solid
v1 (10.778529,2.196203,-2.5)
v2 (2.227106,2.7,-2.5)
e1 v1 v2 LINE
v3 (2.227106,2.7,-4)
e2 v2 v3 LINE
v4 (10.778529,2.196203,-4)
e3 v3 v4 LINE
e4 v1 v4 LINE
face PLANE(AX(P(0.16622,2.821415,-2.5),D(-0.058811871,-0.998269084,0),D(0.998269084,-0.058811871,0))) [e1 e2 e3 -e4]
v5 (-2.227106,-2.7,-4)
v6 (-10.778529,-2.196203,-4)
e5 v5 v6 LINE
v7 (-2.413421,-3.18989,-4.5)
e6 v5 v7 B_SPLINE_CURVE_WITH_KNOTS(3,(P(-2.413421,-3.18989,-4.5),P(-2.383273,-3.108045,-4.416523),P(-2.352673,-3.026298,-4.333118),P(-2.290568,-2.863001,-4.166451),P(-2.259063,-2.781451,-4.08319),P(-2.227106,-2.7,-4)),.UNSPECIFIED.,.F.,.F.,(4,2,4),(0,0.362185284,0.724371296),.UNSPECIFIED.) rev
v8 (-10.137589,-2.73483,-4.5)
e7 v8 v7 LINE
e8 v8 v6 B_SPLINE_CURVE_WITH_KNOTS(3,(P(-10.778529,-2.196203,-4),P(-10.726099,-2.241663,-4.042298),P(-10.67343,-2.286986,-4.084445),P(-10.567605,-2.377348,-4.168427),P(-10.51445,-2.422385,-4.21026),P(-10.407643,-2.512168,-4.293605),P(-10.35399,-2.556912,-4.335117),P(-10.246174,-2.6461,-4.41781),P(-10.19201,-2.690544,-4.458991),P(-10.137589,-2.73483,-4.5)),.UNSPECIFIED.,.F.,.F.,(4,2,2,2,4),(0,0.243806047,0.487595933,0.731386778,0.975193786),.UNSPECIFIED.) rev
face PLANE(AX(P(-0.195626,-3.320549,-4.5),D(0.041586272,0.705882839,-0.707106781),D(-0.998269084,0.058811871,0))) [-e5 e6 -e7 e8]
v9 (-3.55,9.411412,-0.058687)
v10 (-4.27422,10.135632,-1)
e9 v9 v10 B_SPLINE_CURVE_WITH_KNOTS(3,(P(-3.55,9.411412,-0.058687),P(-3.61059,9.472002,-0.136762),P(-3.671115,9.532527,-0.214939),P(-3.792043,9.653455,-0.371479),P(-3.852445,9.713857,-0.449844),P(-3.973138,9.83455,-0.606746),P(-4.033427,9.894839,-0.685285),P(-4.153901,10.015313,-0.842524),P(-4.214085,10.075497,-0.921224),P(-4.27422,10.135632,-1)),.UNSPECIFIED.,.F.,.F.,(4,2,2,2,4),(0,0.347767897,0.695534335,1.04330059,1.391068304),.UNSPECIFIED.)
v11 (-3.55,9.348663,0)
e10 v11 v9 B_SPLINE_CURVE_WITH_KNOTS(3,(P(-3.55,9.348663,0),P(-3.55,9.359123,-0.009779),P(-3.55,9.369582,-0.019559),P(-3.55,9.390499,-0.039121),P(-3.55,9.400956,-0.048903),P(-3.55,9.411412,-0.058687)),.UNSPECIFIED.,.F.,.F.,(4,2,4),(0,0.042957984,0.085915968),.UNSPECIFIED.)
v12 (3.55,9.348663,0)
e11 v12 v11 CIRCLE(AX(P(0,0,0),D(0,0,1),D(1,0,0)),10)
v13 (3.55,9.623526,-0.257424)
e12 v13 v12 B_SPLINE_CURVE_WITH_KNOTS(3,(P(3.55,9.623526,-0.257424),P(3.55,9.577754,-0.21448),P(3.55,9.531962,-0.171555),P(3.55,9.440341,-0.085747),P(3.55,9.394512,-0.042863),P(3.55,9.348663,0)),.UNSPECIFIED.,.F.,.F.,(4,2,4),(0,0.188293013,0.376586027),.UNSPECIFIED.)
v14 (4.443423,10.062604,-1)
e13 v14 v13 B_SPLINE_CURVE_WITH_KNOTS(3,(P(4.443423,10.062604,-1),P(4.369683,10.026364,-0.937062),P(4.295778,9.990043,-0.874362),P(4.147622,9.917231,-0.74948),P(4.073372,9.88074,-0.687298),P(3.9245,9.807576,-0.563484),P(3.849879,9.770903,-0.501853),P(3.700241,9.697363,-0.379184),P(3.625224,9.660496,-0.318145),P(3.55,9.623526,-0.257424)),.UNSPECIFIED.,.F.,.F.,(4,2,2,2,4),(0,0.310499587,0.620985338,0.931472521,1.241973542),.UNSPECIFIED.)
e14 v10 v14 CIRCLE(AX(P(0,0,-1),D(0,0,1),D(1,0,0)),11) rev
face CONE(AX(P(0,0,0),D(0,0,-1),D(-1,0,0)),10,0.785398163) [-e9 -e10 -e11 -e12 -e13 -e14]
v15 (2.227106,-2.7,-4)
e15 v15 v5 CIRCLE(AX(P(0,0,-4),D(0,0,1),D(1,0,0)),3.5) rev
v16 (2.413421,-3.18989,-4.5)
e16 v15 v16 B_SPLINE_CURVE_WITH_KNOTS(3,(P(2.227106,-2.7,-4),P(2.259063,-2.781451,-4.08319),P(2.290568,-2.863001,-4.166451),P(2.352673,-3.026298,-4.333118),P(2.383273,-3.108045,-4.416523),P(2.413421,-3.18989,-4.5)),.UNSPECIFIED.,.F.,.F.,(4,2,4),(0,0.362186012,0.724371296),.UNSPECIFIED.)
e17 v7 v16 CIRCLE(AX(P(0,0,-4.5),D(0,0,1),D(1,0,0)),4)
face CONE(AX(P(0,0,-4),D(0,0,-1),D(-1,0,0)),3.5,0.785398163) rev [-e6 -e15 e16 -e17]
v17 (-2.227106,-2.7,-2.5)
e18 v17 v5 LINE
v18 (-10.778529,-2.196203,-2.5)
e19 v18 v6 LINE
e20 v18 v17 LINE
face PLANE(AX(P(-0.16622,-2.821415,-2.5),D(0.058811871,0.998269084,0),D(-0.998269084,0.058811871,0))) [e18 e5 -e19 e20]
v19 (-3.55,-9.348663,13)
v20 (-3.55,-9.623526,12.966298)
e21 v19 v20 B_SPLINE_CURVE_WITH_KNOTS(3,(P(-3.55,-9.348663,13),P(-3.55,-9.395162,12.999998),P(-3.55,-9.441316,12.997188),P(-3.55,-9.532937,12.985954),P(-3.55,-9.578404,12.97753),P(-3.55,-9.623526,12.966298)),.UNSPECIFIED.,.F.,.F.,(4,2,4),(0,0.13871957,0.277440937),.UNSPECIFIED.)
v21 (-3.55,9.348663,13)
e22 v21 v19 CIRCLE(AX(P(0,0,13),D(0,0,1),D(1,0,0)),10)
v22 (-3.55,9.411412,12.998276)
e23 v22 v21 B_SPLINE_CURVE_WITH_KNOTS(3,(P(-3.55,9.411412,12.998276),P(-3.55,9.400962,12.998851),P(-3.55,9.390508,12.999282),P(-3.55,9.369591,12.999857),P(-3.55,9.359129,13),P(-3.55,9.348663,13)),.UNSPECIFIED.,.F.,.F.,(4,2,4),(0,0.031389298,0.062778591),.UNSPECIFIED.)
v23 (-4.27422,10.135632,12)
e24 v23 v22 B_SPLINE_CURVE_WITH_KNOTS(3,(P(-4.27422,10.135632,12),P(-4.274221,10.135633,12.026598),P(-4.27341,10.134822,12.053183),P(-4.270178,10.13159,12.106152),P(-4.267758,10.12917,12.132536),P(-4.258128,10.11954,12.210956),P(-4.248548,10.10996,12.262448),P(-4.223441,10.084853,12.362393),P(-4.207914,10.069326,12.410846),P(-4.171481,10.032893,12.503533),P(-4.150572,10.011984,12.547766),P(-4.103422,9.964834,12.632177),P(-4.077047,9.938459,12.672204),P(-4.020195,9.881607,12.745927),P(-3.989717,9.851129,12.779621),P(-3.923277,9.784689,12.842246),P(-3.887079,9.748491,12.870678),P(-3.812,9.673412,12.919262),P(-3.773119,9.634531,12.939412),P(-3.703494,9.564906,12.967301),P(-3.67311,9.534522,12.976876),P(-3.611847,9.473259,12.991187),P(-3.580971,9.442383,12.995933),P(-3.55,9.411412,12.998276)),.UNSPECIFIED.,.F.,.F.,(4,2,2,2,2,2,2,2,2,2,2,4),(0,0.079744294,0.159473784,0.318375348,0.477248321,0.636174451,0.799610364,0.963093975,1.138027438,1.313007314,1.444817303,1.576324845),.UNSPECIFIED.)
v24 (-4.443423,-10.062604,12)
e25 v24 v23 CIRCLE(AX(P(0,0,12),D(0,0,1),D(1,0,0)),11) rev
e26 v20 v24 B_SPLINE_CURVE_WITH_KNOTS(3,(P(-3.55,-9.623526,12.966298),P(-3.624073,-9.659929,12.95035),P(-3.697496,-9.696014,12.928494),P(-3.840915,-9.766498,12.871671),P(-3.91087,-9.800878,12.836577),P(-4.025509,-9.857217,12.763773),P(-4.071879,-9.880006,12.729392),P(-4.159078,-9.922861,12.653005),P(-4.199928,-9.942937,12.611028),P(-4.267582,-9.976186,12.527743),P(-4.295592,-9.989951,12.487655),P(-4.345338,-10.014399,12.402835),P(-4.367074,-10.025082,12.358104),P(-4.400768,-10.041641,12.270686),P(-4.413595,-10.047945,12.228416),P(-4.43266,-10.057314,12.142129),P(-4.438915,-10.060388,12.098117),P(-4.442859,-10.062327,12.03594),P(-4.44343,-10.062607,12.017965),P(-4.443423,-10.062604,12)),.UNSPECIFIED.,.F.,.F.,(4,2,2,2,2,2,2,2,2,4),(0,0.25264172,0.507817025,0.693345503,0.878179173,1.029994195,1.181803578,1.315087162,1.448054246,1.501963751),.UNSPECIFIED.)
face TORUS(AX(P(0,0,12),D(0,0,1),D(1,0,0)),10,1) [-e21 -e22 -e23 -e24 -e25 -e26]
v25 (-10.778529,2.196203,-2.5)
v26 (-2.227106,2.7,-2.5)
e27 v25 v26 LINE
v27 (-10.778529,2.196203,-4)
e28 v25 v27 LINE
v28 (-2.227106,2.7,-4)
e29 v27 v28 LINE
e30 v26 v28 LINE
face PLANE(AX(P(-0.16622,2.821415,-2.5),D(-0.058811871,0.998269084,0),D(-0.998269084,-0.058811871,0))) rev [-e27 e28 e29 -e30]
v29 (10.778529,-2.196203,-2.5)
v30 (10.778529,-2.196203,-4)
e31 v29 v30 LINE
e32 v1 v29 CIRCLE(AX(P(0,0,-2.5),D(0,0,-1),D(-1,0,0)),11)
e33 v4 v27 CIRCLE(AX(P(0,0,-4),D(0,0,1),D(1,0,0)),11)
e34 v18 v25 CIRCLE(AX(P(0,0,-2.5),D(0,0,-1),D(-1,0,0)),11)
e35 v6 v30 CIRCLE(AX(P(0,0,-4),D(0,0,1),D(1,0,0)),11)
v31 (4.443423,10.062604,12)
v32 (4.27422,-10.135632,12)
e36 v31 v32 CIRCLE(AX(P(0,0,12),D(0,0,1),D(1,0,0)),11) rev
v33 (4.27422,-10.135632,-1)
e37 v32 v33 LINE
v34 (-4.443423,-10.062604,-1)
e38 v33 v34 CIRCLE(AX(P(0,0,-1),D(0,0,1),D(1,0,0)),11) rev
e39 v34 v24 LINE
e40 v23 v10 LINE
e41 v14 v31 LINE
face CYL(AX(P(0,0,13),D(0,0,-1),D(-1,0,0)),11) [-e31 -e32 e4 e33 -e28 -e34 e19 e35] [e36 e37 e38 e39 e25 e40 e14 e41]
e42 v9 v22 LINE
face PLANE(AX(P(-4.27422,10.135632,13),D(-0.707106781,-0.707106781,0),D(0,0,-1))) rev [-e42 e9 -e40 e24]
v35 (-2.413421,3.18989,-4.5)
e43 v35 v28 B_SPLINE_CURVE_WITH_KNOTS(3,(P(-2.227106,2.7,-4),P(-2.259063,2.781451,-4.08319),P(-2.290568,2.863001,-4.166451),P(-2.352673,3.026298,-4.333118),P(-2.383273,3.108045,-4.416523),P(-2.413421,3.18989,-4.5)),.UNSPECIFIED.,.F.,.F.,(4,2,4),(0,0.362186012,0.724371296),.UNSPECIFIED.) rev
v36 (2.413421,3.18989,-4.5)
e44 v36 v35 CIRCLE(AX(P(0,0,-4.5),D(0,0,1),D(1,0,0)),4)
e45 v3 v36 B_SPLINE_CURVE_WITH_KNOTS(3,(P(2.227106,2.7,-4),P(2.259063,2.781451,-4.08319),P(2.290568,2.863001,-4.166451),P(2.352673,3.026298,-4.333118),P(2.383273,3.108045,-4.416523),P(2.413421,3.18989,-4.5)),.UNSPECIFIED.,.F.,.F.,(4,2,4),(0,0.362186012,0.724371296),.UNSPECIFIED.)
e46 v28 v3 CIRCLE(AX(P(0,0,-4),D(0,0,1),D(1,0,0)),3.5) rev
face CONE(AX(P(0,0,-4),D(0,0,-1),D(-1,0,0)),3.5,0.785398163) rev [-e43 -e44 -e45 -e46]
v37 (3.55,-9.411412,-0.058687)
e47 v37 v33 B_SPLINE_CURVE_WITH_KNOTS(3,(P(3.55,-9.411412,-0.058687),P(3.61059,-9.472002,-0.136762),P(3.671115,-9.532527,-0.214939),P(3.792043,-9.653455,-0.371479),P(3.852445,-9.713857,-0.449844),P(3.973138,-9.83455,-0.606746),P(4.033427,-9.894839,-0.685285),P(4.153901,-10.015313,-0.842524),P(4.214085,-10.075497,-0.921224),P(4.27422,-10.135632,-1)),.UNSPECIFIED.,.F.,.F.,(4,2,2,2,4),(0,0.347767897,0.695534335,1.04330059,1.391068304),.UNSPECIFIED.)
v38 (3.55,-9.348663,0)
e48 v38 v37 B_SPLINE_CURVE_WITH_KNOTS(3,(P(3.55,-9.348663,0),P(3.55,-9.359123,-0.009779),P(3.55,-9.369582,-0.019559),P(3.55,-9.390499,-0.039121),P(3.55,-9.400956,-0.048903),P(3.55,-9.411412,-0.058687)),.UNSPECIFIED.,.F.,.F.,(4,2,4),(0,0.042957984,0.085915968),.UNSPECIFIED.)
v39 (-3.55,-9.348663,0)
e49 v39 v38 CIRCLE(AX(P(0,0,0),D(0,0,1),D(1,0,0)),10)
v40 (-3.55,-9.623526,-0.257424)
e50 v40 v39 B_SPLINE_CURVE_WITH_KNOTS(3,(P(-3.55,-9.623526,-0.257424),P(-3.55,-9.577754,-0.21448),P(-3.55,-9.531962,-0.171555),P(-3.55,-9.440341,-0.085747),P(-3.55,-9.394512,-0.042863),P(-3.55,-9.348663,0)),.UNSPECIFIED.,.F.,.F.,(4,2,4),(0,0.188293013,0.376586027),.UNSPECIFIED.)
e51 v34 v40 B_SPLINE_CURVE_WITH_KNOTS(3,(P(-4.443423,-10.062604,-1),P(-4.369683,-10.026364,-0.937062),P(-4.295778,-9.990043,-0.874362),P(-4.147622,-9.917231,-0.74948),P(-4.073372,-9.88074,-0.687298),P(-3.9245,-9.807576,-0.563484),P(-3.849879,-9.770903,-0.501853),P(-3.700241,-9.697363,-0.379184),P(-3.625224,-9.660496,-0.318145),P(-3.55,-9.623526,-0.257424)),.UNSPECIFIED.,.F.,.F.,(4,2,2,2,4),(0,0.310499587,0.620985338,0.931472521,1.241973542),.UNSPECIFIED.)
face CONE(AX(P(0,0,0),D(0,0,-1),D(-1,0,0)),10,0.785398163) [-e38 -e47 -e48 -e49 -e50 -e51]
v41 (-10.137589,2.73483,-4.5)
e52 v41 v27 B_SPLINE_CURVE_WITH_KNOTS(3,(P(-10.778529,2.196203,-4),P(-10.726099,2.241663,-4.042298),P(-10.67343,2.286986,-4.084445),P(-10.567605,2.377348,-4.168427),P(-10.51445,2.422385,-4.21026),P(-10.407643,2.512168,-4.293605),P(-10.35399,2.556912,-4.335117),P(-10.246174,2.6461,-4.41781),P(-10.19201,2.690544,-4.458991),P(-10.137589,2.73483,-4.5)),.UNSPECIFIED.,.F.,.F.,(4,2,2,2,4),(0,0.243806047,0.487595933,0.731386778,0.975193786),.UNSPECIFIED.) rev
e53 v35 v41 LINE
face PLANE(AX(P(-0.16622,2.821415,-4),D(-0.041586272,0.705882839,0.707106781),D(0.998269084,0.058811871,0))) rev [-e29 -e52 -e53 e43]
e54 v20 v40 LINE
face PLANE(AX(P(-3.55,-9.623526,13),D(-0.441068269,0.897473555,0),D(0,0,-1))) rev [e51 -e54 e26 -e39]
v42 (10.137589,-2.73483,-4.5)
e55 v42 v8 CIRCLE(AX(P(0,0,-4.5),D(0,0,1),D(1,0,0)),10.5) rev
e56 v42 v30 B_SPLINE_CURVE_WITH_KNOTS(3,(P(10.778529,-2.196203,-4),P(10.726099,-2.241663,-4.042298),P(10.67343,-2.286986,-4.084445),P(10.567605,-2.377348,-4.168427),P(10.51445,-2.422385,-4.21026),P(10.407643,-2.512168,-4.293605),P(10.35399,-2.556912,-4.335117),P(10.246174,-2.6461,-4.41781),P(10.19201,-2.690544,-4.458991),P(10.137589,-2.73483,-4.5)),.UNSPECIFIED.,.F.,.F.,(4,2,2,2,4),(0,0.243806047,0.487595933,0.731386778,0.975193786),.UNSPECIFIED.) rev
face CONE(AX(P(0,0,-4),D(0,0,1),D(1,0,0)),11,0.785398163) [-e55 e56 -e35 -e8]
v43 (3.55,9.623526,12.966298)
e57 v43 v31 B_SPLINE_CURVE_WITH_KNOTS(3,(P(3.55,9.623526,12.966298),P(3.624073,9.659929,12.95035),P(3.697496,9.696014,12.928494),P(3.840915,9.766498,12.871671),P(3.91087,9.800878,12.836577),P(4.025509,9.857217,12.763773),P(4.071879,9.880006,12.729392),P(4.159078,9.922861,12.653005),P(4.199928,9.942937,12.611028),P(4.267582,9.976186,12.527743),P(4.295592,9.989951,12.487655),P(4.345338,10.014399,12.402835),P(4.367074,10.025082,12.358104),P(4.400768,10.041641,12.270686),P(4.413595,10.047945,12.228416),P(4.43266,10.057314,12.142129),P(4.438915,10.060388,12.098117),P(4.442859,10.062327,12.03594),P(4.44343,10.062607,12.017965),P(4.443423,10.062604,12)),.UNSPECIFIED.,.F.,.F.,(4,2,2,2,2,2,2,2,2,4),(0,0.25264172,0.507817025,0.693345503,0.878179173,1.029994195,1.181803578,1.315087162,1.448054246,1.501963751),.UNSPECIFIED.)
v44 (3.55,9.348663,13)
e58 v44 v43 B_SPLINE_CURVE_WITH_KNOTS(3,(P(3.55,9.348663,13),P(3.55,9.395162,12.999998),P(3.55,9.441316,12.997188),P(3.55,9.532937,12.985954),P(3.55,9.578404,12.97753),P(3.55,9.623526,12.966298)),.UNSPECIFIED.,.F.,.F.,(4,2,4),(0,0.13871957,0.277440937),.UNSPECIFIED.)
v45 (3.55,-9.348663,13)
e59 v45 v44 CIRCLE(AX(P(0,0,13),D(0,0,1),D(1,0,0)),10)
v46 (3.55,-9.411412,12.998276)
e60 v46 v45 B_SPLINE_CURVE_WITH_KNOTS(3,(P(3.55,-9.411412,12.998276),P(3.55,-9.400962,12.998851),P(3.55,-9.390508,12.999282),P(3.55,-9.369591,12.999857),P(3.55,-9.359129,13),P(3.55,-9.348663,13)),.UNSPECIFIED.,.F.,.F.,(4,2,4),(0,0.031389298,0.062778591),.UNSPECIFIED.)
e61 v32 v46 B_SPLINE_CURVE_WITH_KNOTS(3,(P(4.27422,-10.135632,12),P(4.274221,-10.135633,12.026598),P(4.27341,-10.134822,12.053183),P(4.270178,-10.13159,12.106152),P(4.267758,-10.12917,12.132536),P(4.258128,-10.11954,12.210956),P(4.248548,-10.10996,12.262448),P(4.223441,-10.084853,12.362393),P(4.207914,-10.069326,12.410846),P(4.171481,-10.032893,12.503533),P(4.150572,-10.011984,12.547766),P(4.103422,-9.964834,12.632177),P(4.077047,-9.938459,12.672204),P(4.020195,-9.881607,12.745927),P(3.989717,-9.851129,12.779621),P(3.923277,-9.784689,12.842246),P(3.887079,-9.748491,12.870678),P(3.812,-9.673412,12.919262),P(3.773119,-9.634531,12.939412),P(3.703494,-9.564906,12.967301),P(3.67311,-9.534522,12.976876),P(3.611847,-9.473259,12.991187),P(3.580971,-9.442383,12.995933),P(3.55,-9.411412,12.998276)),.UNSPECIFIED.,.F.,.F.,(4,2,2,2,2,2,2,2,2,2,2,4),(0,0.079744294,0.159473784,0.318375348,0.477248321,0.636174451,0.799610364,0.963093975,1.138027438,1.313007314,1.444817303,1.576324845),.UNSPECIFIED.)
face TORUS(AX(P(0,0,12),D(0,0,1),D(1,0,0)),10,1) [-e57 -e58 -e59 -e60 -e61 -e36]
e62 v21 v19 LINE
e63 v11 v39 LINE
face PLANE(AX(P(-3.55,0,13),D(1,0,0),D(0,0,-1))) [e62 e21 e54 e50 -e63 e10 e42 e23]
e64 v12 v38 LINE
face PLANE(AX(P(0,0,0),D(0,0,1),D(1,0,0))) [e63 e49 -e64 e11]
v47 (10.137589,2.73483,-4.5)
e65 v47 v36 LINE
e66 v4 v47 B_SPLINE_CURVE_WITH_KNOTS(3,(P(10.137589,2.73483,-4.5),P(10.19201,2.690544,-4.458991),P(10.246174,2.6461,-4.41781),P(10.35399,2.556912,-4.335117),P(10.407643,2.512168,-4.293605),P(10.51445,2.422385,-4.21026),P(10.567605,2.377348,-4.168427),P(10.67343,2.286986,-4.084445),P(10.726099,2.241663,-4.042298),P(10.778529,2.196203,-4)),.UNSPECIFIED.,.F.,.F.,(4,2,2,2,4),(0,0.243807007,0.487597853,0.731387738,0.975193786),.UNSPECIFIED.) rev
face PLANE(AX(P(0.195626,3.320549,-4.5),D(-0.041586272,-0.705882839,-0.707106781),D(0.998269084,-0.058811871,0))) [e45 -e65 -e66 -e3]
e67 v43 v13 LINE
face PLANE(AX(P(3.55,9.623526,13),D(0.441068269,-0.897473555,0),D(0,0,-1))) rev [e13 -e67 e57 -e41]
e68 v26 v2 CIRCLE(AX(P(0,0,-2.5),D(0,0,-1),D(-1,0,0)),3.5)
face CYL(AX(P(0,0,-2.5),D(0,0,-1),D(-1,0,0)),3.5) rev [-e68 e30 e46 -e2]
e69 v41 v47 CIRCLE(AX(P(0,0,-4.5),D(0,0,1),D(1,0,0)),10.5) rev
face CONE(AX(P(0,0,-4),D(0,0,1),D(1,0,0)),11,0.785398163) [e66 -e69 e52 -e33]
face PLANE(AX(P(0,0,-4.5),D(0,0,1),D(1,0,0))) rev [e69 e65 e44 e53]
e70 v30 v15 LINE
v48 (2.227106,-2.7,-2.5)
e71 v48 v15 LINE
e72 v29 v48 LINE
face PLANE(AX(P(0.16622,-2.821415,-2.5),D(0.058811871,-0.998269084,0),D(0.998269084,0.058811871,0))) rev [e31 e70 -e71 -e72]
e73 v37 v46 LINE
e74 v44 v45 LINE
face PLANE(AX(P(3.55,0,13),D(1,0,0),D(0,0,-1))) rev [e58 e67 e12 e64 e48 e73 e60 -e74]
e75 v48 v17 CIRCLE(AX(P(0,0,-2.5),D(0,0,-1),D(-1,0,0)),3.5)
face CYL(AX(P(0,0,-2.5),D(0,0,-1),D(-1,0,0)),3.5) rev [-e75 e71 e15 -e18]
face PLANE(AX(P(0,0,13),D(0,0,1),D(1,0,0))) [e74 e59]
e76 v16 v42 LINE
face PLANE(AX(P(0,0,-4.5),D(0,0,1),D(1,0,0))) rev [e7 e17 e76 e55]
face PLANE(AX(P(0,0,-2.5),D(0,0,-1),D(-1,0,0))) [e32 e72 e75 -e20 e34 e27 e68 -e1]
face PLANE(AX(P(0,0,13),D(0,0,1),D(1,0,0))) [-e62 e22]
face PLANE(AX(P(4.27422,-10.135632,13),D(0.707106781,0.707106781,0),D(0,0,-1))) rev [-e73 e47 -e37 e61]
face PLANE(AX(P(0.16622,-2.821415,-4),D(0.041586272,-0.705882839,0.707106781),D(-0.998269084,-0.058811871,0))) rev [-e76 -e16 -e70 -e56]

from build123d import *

# Parameters (mm, degrees)
PILL_SLOT_DEPTH           = 13
BASE_START                = -4.5
SKETCH2_5_R               = 11
BASE_DEPTH                = 4.5
SKETCH3_R                 = 3.5
SERVO_ROTATION_SLOT_DEPTH = 2
CHAMFER1_SIZE             = 0.787885924
CHAMFER1_SIZE_2           = 1
FILLET1_R                 = 1
CHAMFER2_SIZE             = 0.5
CHAMFER4_SIZE             = 1


with BuildPart() as part:
    # Sketch2 → Pill Slot (new body)
    with BuildSketch(Plane.XY):
        with BuildLine():
            ThreePointArc((11, 0), (8.945669343, 6.401171768), (3.55, 10.411412008))
            Line((3.55, 10.411412008), (3.55, 0))
            Line((3.55, 0), (11, 0))
        make_face()
        with BuildLine():
            Line((11, 0), (3.55, 0))
            Line((3.55, 0), (3.55, -10.411412008))
            ThreePointArc((3.55, -10.411412008), (8.945669343, -6.401171768), (11, 0))
        make_face()
        with BuildLine():
            Line((-3.55, -10.411412008), (-3.55, 10.411412008))
            ThreePointArc((-3.55, 10.411412008), (-11, 0), (-3.55, -10.411412008))
        make_face()
    extrude(amount=PILL_SLOT_DEPTH)

    # Sketch2<5> → Base (add)
    with BuildSketch(Plane.XY.offset(BASE_START)):
        with Locations(Location((0, 0, 0), (0, 0, 108.827939217))):
            Circle(SKETCH2_5_R)
    extrude(amount=BASE_DEPTH)

    # Sketch3 → Servo Rotation slot (cut)
    with BuildSketch(Plane(origin=(0, 0, -4.5), x_dir=(-1, 0, 0), z_dir=(0, 0, -1))):
        with BuildLine():
            Line((-2.227105745, 2.7), (-10.778529281, 2.196202755))
            ThreePointArc((-10.778529281, 2.196202755), (-11, 0), (-10.778529281, -2.196202755))
            Line((-10.778529281, -2.196202755), (-2.227105745, -2.7))
            ThreePointArc((-2.227105745, -2.7), (-3.5, 0), (-2.227105745, 2.7))
        make_face()
        Circle(SKETCH3_R)
        with BuildLine():
            ThreePointArc((11, 0), (10.94449227, 1.103670673), (10.778529281, 2.196202755))
            Line((10.778529281, 2.196202755), (2.227105745, 2.7))
            ThreePointArc((2.227105745, 2.7), (3.165822966, 1.492502913), (3.5, 0))
            ThreePointArc((3.5, 0), (3.165822966, -1.492502913), (2.227105745, -2.7))
            Line((2.227105745, -2.7), (10.778529281, -2.196202755))
            ThreePointArc((10.778529281, -2.196202755), (10.94449227, -1.103670673), (11, 0))
        make_face()
    extrude(amount=-SERVO_ROTATION_SLOT_DEPTH, mode=Mode.SUBTRACT)

    # Chamfer1
    # the kernel refuses this chamfer: 1, 0.787885924 mm, written as the material it takes off along each edge
    with BuildSketch(Plane(origin=(3.55, 10.411412008, 0), x_dir=(0.9315227050820926, -0.36368317244071224, 0), z_dir=(0, 0, 1))) as chamfer1_piece_1:
        with BuildLine():
            Line((0.959099491, 0), (CHAMFER1_SIZE * 0.363683172432, -CHAMFER1_SIZE * 0.93152270506))
            Line((CHAMFER1_SIZE * 0.363683172432, -CHAMFER1_SIZE * 0.93152270506), (0, 0))
            ThreePointArc((0, 0), (0.493056629, 0.010449768), (0.959099491, 0))
        make_face()
    extrude(amount=15.466411675, mode=Mode.SUBTRACT)
    with BuildSketch(Plane(origin=(3.55, -10.411412008, 0), x_dir=(0.9345365261076723, 0.35586722435566304, 0), z_dir=(0, 0, 1))) as chamfer1_piece_2:
        with BuildLine():
            Line((0.77495125, 0), (CHAMFER1_SIZE_2 * 0.355867224356, CHAMFER1_SIZE_2 * 0.934536526108))
            Line((CHAMFER1_SIZE_2 * 0.355867224356, CHAMFER1_SIZE_2 * 0.934536526108), (0, 0))
            ThreePointArc((0, 0), (0.395650754, -0.006823506), (0.77495125, 0))
        make_face()
    extrude(amount=15.571682988, mode=Mode.SUBTRACT)
    with BuildSketch(Plane(origin=(-3.55, 10.411412008, 0), x_dir=(0, -1, 0), z_dir=(0, 0, 1))) as chamfer1_piece_3:
        with BuildLine():
            Line((CHAMFER1_SIZE_2, 0), (0.275779751, -0.724220249))
            ThreePointArc((0.275779751, -0.724220249), (0.13442232, -0.372178343), (0, 0))
            Line((0, 0), (CHAMFER1_SIZE_2, 0))
        make_face()
    extrude(amount=15.571682988, mode=Mode.SUBTRACT)
    with BuildSketch(Plane(origin=(-3.55, -10.411412008, 0), x_dir=(0, 1, 0), z_dir=(0, 0, 1))) as chamfer1_piece_4:
        with BuildLine():
            Line((CHAMFER1_SIZE, 0), (0.348808346, 0.893422953))
            ThreePointArc((0.348808346, 0.893422953), (0.169582203, 0.463093849), (0, 0))
            Line((0, 0), (CHAMFER1_SIZE, 0))
        make_face()
    extrude(amount=15.466411675, mode=Mode.SUBTRACT)

    # Fillet1
    fillet1_edges = [part.edges().sort_by_distance(p)[0] for p in [
        (-10.999614053, 0.0921449, 13),
        (10.999614053, -0.0921449, 13),
    ]]
    fillet(fillet1_edges, radius=FILLET1_R)

    # Chamfer2
    chamfer2_edges = [part.edges().sort_by_distance(p)[0] for p in [
        (5.471318366, 9.542781321, -4.5),
        (0, -11, -4.5),
        (6.502817513, 2.448101378, -4.5),
        (-6.502817513, -2.448101378, -4.5),
        (6.502817513, -2.448101378, -4.5),
        (0, -3.5, -4.5),
        (-6.502817513, 2.448101378, -4.5),
        (0, 3.5, -4.5),
    ]]
    chamfer(chamfer2_edges, length=CHAMFER2_SIZE)

    # Chamfer4
    # the kernel refuses this chamfer: 1 mm, written as the material it takes off along each edge
    with BuildSketch(Plane(origin=(0, 0, 0), x_dir=(0.6048985718771838, 0.79630252903086, 0), z_dir=(0.79630252903086, -0.6048985718771838, 0))) as chamfer4_piece_1_section:
        Polygon((11, -CHAMFER4_SIZE), (11 - CHAMFER4_SIZE, 0), (11, 0), align=None)
    chamfer4_piece_1 = revolve(axis=Axis((0, 0, 0), (0, 0, 1)), revolution_arc=56.049482755, mode=Mode.PRIVATE)
    chamfer4_piece_1 = split(chamfer4_piece_1, bisect_by=Plane(origin=(3.55, 0, 0), z_dir=(-1, 0, 0)), keep=Keep.TOP, mode=Mode.PRIVATE)
    chamfer4_piece_1 = split(chamfer4_piece_1, bisect_by=Plane(origin=(-3.11882364, 6.346096367, 0), z_dir=(0.44106826903235785, -0.8974735550715685, 0)), keep=Keep.TOP, mode=Mode.PRIVATE)
    add(chamfer4_piece_1, mode=Mode.SUBTRACT)
    with BuildSketch(Plane(origin=(0, 0, 0), x_dir=(0.6048985718771838, 0.79630252903086, 0), z_dir=(0.79630252903086, -0.6048985718771838, 0))) as chamfer4_piece_2_section:
        Polygon((11, -CHAMFER4_SIZE), (11 - CHAMFER4_SIZE, 0), (11, 0), align=None)
    chamfer4_piece_2 = revolve(axis=Axis((0, 0, 0), (0, 0, 1)), revolution_arc=56.049482755, mode=Mode.PRIVATE)
    chamfer4_piece_2 = split(chamfer4_piece_2, bisect_by=Plane(origin=(3.55, 0, 0), z_dir=(1, 0, 0)), keep=Keep.TOP, mode=Mode.PRIVATE)
    chamfer4_piece_2 = split(chamfer4_piece_2, bisect_by=Plane(origin=(-3.11882364, 6.346096367, 0), z_dir=(-0.44106826903235785, 0.8974735550715685, 0)), keep=Keep.TOP, mode=Mode.PRIVATE)
    add(chamfer4_piece_2, mode=Mode.SUBTRACT)
    with BuildSketch(Plane(origin=(0, 0, 0), x_dir=(0.6048985718771838, 0.79630252903086, 0), z_dir=(0.79630252903086, -0.6048985718771838, 0))) as chamfer4_piece_3_section:
        Polygon((11, -CHAMFER4_SIZE), (11 - CHAMFER4_SIZE, 0), (11, 0), align=None)
    chamfer4_piece_3 = revolve(axis=Axis((0, 0, 0), (0, 0, 1)), revolution_arc=56.049482755, mode=Mode.PRIVATE)
    chamfer4_piece_3 = split(chamfer4_piece_3, bisect_by=Plane(origin=(3.55, 0, 0), z_dir=(-1, 0, 0)), keep=Keep.TOP, mode=Mode.PRIVATE)
    chamfer4_piece_3 = split(chamfer4_piece_3, bisect_by=Plane(origin=(-3.11882364, 6.346096367, 0), z_dir=(-0.44106826903235785, 0.8974735550715685, 0)), keep=Keep.TOP, mode=Mode.PRIVATE)
    add(chamfer4_piece_3, mode=Mode.SUBTRACT)
    with BuildSketch(Plane(origin=(0, 0, 0), x_dir=(-0.6048985718728862, -0.7963025290341244, 0), z_dir=(-0.7963025290341244, 0.6048985718728862, 0))) as chamfer4_piece_4_section:
        Polygon((11, -CHAMFER4_SIZE), (11 - CHAMFER4_SIZE, 0), (11, 0), align=None)
    chamfer4_piece_4 = revolve(axis=Axis((0, 0, 0), (0, 0, 1)), revolution_arc=56.049482754, mode=Mode.PRIVATE)
    chamfer4_piece_4 = split(chamfer4_piece_4, bisect_by=Plane(origin=(-3.55, 0, 0), z_dir=(1, 0, 0)), keep=Keep.TOP, mode=Mode.PRIVATE)
    chamfer4_piece_4 = split(chamfer4_piece_4, bisect_by=Plane(origin=(3.11882364, -6.346096367, 0), z_dir=(-0.44106826904770263, 0.8974735550640272, 0)), keep=Keep.TOP, mode=Mode.PRIVATE)
    add(chamfer4_piece_4, mode=Mode.SUBTRACT)
    with BuildSketch(Plane(origin=(0, 0, 0), x_dir=(-0.6048985718728862, -0.7963025290341244, 0), z_dir=(-0.7963025290341244, 0.6048985718728862, 0))) as chamfer4_piece_5_section:
        Polygon((11, -CHAMFER4_SIZE), (11 - CHAMFER4_SIZE, 0), (11, 0), align=None)
    chamfer4_piece_5 = revolve(axis=Axis((0, 0, 0), (0, 0, 1)), revolution_arc=56.049482754, mode=Mode.PRIVATE)
    chamfer4_piece_5 = split(chamfer4_piece_5, bisect_by=Plane(origin=(-3.55, 0, 0), z_dir=(-1, 0, 0)), keep=Keep.TOP, mode=Mode.PRIVATE)
    chamfer4_piece_5 = split(chamfer4_piece_5, bisect_by=Plane(origin=(3.11882364, -6.346096367, 0), z_dir=(0.44106826904770263, -0.8974735550640272, 0)), keep=Keep.TOP, mode=Mode.PRIVATE)
    add(chamfer4_piece_5, mode=Mode.SUBTRACT)
    with BuildSketch(Plane(origin=(0, 0, 0), x_dir=(-0.6048985718728862, -0.7963025290341244, 0), z_dir=(-0.7963025290341244, 0.6048985718728862, 0))) as chamfer4_piece_6_section:
        Polygon((11, -CHAMFER4_SIZE), (11 - CHAMFER4_SIZE, 0), (11, 0), align=None)
    chamfer4_piece_6 = revolve(axis=Axis((0, 0, 0), (0, 0, 1)), revolution_arc=56.049482754, mode=Mode.PRIVATE)
    chamfer4_piece_6 = split(chamfer4_piece_6, bisect_by=Plane(origin=(-3.55, 0, 0), z_dir=(1, 0, 0)), keep=Keep.TOP, mode=Mode.PRIVATE)
    chamfer4_piece_6 = split(chamfer4_piece_6, bisect_by=Plane(origin=(3.11882364, -6.346096367, 0), z_dir=(0.44106826904770263, -0.8974735550640272, 0)), keep=Keep.TOP, mode=Mode.PRIVATE)
    add(chamfer4_piece_6, mode=Mode.SUBTRACT)
    with BuildSketch(Plane(origin=(0, -1e-09, 0), x_dir=(0.32272727272524954, -0.9464920007265367, 0), z_dir=(-0.9464920007265367, -0.32272727272524954, 0))) as chamfer4_piece_7_section:
        Polygon((10.999999999, -CHAMFER4_SIZE), (10.999999999 - CHAMFER4_SIZE, 0), (10.999999999, 0), align=None)
    chamfer4_piece_7 = revolve(axis=Axis((0, -1e-09, 0), (0, 0, 1)), revolution_arc=17.432483992, mode=Mode.PRIVATE)
    chamfer4_piece_7 = split(chamfer4_piece_7, bisect_by=Plane(origin=(-2.930706004, -2.930706004, 0), z_dir=(-0.7071067811864781, -0.7071067811866171, 0)), keep=Keep.TOP, mode=Mode.PRIVATE)
    chamfer4_piece_7 = split(chamfer4_piece_7, bisect_by=Plane(origin=(3.55, -1e-09, 0), z_dir=(1, 0, 0)), keep=Keep.TOP, mode=Mode.PRIVATE)
    add(chamfer4_piece_7, mode=Mode.SUBTRACT)
    with BuildSketch(Plane(origin=(0, -1e-09, 0), x_dir=(0.32272727272524954, -0.9464920007265367, 0), z_dir=(-0.9464920007265367, -0.32272727272524954, 0))) as chamfer4_piece_8_section:
        Polygon((10.999999999, -CHAMFER4_SIZE), (10.999999999 - CHAMFER4_SIZE, 0), (10.999999999, 0), align=None)
    chamfer4_piece_8 = revolve(axis=Axis((0, -1e-09, 0), (0, 0, 1)), revolution_arc=17.432483992, mode=Mode.PRIVATE)
    chamfer4_piece_8 = split(chamfer4_piece_8, bisect_by=Plane(origin=(-2.930706004, -2.930706004, 0), z_dir=(-0.7071067811864781, -0.7071067811866171, 0)), keep=Keep.TOP, mode=Mode.PRIVATE)
    chamfer4_piece_8 = split(chamfer4_piece_8, bisect_by=Plane(origin=(3.55, -1e-09, 0), z_dir=(-1, 0, 0)), keep=Keep.TOP, mode=Mode.PRIVATE)
    add(chamfer4_piece_8, mode=Mode.SUBTRACT)
    with BuildSketch(Plane(origin=(0, -1e-09, 0), x_dir=(0.32272727272524954, -0.9464920007265367, 0), z_dir=(-0.9464920007265367, -0.32272727272524954, 0))) as chamfer4_piece_9_section:
        Polygon((10.999999999, -CHAMFER4_SIZE), (10.999999999 - CHAMFER4_SIZE, 0), (10.999999999, 0), align=None)
    chamfer4_piece_9 = revolve(axis=Axis((0, -1e-09, 0), (0, 0, 1)), revolution_arc=17.432483992, mode=Mode.PRIVATE)
    chamfer4_piece_9 = split(chamfer4_piece_9, bisect_by=Plane(origin=(-2.930706004, -2.930706004, 0), z_dir=(0.7071067811864781, 0.7071067811866171, 0)), keep=Keep.TOP, mode=Mode.PRIVATE)
    chamfer4_piece_9 = split(chamfer4_piece_9, bisect_by=Plane(origin=(3.55, -1e-09, 0), z_dir=(-1, 0, 0)), keep=Keep.TOP, mode=Mode.PRIVATE)
    add(chamfer4_piece_9, mode=Mode.SUBTRACT)
    with BuildSketch(Plane(origin=(0, 0, 0), x_dir=(-0.32272727272727286, 0.9464920007258469, 0), z_dir=(0.9464920007258469, 0.32272727272727286, 0))) as chamfer4_piece_10_section:
        Polygon((11, -CHAMFER4_SIZE), (11 - CHAMFER4_SIZE, 0), (11, 0), align=None)
    chamfer4_piece_10 = revolve(axis=Axis((0, 0, 0), (0, 0, 1)), revolution_arc=17.43248399, mode=Mode.PRIVATE)
    chamfer4_piece_10 = split(chamfer4_piece_10, bisect_by=Plane(origin=(2.930706004, 2.930706004, 0), z_dir=(0.7071067811865476, 0.7071067811865476, 0)), keep=Keep.TOP, mode=Mode.PRIVATE)
    chamfer4_piece_10 = split(chamfer4_piece_10, bisect_by=Plane(origin=(-3.55, 0, 0), z_dir=(-1, 0, 0)), keep=Keep.TOP, mode=Mode.PRIVATE)
    add(chamfer4_piece_10, mode=Mode.SUBTRACT)
    with BuildSketch(Plane(origin=(0, 0, 0), x_dir=(-0.32272727272727286, 0.9464920007258469, 0), z_dir=(0.9464920007258469, 0.32272727272727286, 0))) as chamfer4_piece_11_section:
        Polygon((11, -CHAMFER4_SIZE), (11 - CHAMFER4_SIZE, 0), (11, 0), align=None)
    chamfer4_piece_11 = revolve(axis=Axis((0, 0, 0), (0, 0, 1)), revolution_arc=17.43248399, mode=Mode.PRIVATE)
    chamfer4_piece_11 = split(chamfer4_piece_11, bisect_by=Plane(origin=(2.930706004, 2.930706004, 0), z_dir=(0.7071067811865476, 0.7071067811865476, 0)), keep=Keep.TOP, mode=Mode.PRIVATE)
    chamfer4_piece_11 = split(chamfer4_piece_11, bisect_by=Plane(origin=(-3.55, 0, 0), z_dir=(1, 0, 0)), keep=Keep.TOP, mode=Mode.PRIVATE)
    add(chamfer4_piece_11, mode=Mode.SUBTRACT)
    with BuildSketch(Plane(origin=(0, 0, 0), x_dir=(-0.32272727272727286, 0.9464920007258469, 0), z_dir=(0.9464920007258469, 0.32272727272727286, 0))) as chamfer4_piece_12_section:
        Polygon((11, -CHAMFER4_SIZE), (11 - CHAMFER4_SIZE, 0), (11, 0), align=None)
    chamfer4_piece_12 = revolve(axis=Axis((0, 0, 0), (0, 0, 1)), revolution_arc=17.43248399, mode=Mode.PRIVATE)
    chamfer4_piece_12 = split(chamfer4_piece_12, bisect_by=Plane(origin=(2.930706004, 2.930706004, 0), z_dir=(-0.7071067811865476, -0.7071067811865476, 0)), keep=Keep.TOP, mode=Mode.PRIVATE)
    chamfer4_piece_12 = split(chamfer4_piece_12, bisect_by=Plane(origin=(-3.55, 0, 0), z_dir=(1, 0, 0)), keep=Keep.TOP, mode=Mode.PRIVATE)
    add(chamfer4_piece_12, mode=Mode.SUBTRACT)


solid = part.part
